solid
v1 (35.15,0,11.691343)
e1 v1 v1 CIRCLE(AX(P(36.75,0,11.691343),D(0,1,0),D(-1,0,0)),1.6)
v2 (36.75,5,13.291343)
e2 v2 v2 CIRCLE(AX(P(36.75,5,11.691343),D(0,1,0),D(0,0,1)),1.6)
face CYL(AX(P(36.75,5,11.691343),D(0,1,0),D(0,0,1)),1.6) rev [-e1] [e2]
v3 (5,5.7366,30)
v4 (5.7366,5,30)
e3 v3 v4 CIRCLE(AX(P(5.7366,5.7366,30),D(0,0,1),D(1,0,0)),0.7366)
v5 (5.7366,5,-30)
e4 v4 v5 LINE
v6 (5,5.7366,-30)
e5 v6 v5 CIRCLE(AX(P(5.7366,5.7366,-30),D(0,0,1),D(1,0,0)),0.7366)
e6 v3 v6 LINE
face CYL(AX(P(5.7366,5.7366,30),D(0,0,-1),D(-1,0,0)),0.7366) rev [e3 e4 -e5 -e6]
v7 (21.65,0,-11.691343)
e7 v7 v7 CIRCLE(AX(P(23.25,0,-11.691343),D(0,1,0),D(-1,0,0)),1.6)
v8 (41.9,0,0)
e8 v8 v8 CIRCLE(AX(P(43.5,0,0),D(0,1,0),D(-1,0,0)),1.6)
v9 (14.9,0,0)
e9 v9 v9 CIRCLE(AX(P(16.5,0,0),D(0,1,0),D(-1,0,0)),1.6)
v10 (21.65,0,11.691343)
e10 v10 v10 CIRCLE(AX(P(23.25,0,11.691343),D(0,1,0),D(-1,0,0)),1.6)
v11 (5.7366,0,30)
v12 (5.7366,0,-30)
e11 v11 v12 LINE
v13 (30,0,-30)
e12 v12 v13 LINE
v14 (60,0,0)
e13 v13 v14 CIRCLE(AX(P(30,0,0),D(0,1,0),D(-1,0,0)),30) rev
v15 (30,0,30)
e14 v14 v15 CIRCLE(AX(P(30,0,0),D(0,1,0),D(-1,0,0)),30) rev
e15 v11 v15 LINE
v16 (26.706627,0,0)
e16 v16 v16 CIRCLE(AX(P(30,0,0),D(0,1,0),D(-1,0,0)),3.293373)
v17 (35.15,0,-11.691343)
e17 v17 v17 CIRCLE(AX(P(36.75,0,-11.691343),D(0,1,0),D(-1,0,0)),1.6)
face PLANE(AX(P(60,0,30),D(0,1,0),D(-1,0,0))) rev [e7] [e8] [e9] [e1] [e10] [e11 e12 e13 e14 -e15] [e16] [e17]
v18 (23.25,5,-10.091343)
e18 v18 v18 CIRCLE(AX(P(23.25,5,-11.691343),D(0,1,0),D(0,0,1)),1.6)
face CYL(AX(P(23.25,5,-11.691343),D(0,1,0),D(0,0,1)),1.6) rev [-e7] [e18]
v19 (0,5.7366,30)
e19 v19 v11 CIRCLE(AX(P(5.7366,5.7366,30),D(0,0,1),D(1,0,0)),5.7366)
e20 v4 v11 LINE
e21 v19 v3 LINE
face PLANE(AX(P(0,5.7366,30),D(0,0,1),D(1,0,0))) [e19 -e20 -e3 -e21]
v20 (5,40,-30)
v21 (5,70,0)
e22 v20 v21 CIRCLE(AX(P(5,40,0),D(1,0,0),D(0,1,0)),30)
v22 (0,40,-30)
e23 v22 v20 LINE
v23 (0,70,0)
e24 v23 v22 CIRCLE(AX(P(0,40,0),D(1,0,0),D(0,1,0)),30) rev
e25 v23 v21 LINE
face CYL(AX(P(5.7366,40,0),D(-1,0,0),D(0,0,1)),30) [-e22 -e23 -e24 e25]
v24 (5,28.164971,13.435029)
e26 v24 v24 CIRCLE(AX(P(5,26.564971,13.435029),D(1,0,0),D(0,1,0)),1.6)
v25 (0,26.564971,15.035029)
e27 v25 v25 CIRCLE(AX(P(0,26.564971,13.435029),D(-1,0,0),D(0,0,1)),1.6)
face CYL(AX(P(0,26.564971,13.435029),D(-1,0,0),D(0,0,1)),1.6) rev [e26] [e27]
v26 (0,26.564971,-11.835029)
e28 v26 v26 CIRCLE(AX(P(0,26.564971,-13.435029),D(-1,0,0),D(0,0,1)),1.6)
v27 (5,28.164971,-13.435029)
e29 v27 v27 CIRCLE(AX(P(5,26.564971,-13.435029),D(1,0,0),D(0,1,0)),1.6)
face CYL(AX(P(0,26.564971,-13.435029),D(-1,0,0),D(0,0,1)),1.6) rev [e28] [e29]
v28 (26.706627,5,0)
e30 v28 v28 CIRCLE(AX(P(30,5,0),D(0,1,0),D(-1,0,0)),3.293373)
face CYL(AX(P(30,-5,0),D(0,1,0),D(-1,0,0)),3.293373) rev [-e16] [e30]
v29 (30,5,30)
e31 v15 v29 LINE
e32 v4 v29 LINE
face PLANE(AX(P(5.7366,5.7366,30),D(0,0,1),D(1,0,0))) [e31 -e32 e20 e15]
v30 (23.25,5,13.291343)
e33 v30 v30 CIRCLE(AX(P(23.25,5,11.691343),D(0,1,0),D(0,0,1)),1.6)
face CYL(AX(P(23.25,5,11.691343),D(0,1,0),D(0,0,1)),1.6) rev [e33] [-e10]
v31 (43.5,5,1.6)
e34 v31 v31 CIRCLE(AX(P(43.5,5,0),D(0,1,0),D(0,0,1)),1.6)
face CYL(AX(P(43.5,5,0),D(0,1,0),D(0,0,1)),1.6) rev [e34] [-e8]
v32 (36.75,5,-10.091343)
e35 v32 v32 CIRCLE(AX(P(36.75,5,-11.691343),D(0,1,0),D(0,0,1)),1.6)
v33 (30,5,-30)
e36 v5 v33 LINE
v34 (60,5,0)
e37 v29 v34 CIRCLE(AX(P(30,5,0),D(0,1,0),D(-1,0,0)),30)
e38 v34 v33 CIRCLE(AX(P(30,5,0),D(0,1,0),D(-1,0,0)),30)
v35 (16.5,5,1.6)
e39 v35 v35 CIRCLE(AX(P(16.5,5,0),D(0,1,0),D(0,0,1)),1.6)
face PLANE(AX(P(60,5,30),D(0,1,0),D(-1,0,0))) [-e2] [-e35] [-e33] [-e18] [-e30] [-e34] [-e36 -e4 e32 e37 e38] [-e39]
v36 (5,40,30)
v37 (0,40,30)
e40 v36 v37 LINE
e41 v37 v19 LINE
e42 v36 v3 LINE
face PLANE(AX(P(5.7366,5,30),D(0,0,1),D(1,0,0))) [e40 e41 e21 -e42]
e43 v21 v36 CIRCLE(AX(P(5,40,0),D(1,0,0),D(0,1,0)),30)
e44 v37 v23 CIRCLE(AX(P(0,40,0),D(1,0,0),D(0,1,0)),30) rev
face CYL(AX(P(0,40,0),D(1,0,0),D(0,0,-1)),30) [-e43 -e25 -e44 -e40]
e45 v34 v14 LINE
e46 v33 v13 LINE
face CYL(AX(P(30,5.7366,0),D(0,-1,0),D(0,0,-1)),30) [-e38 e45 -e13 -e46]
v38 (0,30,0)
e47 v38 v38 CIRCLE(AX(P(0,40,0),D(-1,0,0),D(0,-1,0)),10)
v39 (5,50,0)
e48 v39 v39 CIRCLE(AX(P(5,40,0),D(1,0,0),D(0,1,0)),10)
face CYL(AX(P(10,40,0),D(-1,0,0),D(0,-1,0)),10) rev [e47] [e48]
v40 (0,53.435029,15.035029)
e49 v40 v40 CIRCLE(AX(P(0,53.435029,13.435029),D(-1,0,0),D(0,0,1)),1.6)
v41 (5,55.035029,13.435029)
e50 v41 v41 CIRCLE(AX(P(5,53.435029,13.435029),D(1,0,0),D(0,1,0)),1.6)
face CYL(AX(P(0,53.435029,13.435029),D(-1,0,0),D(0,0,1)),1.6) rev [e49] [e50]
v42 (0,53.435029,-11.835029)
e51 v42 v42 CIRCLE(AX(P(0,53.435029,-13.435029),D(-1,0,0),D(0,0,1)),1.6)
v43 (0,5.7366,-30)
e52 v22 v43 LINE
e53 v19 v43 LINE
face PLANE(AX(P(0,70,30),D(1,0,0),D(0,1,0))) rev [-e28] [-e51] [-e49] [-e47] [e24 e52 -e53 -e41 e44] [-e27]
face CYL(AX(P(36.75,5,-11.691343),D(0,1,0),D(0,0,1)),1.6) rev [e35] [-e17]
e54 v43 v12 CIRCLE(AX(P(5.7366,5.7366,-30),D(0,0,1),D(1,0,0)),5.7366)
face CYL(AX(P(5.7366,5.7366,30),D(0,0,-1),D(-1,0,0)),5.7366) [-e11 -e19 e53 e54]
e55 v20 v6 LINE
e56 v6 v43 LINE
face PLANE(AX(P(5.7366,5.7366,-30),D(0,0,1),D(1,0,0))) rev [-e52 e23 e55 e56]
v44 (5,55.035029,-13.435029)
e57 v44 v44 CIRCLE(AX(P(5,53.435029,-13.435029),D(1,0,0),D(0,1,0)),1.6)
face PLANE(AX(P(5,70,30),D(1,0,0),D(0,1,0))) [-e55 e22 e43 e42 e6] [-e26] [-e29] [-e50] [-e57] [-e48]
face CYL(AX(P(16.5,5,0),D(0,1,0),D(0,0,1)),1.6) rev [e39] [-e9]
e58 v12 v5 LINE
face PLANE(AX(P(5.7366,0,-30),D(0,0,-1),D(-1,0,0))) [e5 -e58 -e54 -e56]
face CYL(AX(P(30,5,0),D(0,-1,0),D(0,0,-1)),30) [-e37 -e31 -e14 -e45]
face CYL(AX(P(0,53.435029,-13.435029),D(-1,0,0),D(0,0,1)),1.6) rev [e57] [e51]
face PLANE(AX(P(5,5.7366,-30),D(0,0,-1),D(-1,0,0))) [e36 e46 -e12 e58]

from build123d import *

# Parameters (mm, degrees)
SM_BASE_FLANGE_1_DEPTH  = 30
SKETCH_2_R              = 3.293373228
CUT_EXTRUDE_1_DEPTH     = 10
HOLE_WIZARD_1_OUTLINE_R = 1.6
HOLE_WIZARD_1_DEPTH     = 5
SKETCH_5_R              = 10
CUT_EXTRUDE_2_DEPTH     = 10
HOLE_WIZARD_2_OUTLINE_R = 1.6
HOLE_WIZARD_2_DEPTH     = 5
FILLET_1_R              = 30


# Read off the part's stored shape, not the designer's step: 孔1, 孔2
# Sheet-metal steps are written as plain solids
with BuildPart() as part:
    # Sketch 1 → 基体-法兰1 (new, symmetric)
    with BuildSketch(Plane.XY):
        with BuildLine():
            Line((60, 0), (5.7366, 0))
            ThreePointArc((5.7366, 0), (1.680211239, 1.680211239), (0, 5.7366))
            Line((0, 5.7366), (0, 70))
            Line((0, 70), (5, 70))
            Line((5, 70), (5, 5.7366))
            ThreePointArc((5, 5.7366), (5.215745145, 5.215745145), (5.7366, 5))
            Line((5.7366, 5), (60, 5))
            Line((60, 5), (60, 0))
        make_face()
    extrude(amount=SM_BASE_FLANGE_1_DEPTH, both=True)

    # Sketch 2 → 切除-拉伸1 (cut)
    with BuildSketch(Plane(origin=(0, 5, 0), x_dir=(1, 0, 0), z_dir=(0, 1, 0))):
        with Locations(Location((30, 0, 0), (0, 0, 180))):
            Circle(SKETCH_2_R)
    extrude(amount=-CUT_EXTRUDE_1_DEPTH, mode=Mode.SUBTRACT)

    # 孔1 outline → 孔1 (cut)
    with BuildSketch(Plane(origin=(0, 0, 0), x_dir=(1, 0, 0), z_dir=(0, 1, 0))):
        with Locations((23.25, -11.691342951)):
            Circle(HOLE_WIZARD_1_OUTLINE_R)
        with Locations((16.5, 0)):
            Circle(HOLE_WIZARD_1_OUTLINE_R)
        with Locations((23.25, 11.691342951)):
            Circle(HOLE_WIZARD_1_OUTLINE_R)
        with Locations((36.75, 11.691342951)):
            Circle(HOLE_WIZARD_1_OUTLINE_R)
        with Locations((43.5, 0)):
            Circle(HOLE_WIZARD_1_OUTLINE_R)
        with Locations((36.75, -11.691342951)):
            Circle(HOLE_WIZARD_1_OUTLINE_R)
    extrude(amount=HOLE_WIZARD_1_DEPTH, mode=Mode.SUBTRACT)

    # 草图5 → 切除-拉伸2 (cut)
    with BuildSketch(Plane.ZY):
        with Locations(Location((0, 40, 0), (0, 0, 270))):
            Circle(SKETCH_5_R)
    extrude(amount=-CUT_EXTRUDE_2_DEPTH, mode=Mode.SUBTRACT)

    # 孔2 outline → 孔2 (cut)
    with BuildSketch(Plane.YZ):
        with Locations((26.564971157, 13.435028843)):
            Circle(HOLE_WIZARD_2_OUTLINE_R)
        with Locations((26.564971157, -13.435028843)):
            Circle(HOLE_WIZARD_2_OUTLINE_R)
        with Locations((53.435028843, -13.435028843)):
            Circle(HOLE_WIZARD_2_OUTLINE_R)
        with Locations((53.435028843, 13.435028843)):
            Circle(HOLE_WIZARD_2_OUTLINE_R)
    extrude(amount=HOLE_WIZARD_2_DEPTH, mode=Mode.SUBTRACT)

    # 圆角1
    fillet_1_edges = [part.edges().sort_by_distance(p)[0] for p in [
        (60, 2.5, -30),
        (60, 2.5, 30),
        (2.5, 70, -30),
        (2.5, 70, 30),
    ]]
    fillet(fillet_1_edges, radius=FILLET_1_R - 0.0001)  # a hair under: the kernel refuses the full size


solid = part.part
